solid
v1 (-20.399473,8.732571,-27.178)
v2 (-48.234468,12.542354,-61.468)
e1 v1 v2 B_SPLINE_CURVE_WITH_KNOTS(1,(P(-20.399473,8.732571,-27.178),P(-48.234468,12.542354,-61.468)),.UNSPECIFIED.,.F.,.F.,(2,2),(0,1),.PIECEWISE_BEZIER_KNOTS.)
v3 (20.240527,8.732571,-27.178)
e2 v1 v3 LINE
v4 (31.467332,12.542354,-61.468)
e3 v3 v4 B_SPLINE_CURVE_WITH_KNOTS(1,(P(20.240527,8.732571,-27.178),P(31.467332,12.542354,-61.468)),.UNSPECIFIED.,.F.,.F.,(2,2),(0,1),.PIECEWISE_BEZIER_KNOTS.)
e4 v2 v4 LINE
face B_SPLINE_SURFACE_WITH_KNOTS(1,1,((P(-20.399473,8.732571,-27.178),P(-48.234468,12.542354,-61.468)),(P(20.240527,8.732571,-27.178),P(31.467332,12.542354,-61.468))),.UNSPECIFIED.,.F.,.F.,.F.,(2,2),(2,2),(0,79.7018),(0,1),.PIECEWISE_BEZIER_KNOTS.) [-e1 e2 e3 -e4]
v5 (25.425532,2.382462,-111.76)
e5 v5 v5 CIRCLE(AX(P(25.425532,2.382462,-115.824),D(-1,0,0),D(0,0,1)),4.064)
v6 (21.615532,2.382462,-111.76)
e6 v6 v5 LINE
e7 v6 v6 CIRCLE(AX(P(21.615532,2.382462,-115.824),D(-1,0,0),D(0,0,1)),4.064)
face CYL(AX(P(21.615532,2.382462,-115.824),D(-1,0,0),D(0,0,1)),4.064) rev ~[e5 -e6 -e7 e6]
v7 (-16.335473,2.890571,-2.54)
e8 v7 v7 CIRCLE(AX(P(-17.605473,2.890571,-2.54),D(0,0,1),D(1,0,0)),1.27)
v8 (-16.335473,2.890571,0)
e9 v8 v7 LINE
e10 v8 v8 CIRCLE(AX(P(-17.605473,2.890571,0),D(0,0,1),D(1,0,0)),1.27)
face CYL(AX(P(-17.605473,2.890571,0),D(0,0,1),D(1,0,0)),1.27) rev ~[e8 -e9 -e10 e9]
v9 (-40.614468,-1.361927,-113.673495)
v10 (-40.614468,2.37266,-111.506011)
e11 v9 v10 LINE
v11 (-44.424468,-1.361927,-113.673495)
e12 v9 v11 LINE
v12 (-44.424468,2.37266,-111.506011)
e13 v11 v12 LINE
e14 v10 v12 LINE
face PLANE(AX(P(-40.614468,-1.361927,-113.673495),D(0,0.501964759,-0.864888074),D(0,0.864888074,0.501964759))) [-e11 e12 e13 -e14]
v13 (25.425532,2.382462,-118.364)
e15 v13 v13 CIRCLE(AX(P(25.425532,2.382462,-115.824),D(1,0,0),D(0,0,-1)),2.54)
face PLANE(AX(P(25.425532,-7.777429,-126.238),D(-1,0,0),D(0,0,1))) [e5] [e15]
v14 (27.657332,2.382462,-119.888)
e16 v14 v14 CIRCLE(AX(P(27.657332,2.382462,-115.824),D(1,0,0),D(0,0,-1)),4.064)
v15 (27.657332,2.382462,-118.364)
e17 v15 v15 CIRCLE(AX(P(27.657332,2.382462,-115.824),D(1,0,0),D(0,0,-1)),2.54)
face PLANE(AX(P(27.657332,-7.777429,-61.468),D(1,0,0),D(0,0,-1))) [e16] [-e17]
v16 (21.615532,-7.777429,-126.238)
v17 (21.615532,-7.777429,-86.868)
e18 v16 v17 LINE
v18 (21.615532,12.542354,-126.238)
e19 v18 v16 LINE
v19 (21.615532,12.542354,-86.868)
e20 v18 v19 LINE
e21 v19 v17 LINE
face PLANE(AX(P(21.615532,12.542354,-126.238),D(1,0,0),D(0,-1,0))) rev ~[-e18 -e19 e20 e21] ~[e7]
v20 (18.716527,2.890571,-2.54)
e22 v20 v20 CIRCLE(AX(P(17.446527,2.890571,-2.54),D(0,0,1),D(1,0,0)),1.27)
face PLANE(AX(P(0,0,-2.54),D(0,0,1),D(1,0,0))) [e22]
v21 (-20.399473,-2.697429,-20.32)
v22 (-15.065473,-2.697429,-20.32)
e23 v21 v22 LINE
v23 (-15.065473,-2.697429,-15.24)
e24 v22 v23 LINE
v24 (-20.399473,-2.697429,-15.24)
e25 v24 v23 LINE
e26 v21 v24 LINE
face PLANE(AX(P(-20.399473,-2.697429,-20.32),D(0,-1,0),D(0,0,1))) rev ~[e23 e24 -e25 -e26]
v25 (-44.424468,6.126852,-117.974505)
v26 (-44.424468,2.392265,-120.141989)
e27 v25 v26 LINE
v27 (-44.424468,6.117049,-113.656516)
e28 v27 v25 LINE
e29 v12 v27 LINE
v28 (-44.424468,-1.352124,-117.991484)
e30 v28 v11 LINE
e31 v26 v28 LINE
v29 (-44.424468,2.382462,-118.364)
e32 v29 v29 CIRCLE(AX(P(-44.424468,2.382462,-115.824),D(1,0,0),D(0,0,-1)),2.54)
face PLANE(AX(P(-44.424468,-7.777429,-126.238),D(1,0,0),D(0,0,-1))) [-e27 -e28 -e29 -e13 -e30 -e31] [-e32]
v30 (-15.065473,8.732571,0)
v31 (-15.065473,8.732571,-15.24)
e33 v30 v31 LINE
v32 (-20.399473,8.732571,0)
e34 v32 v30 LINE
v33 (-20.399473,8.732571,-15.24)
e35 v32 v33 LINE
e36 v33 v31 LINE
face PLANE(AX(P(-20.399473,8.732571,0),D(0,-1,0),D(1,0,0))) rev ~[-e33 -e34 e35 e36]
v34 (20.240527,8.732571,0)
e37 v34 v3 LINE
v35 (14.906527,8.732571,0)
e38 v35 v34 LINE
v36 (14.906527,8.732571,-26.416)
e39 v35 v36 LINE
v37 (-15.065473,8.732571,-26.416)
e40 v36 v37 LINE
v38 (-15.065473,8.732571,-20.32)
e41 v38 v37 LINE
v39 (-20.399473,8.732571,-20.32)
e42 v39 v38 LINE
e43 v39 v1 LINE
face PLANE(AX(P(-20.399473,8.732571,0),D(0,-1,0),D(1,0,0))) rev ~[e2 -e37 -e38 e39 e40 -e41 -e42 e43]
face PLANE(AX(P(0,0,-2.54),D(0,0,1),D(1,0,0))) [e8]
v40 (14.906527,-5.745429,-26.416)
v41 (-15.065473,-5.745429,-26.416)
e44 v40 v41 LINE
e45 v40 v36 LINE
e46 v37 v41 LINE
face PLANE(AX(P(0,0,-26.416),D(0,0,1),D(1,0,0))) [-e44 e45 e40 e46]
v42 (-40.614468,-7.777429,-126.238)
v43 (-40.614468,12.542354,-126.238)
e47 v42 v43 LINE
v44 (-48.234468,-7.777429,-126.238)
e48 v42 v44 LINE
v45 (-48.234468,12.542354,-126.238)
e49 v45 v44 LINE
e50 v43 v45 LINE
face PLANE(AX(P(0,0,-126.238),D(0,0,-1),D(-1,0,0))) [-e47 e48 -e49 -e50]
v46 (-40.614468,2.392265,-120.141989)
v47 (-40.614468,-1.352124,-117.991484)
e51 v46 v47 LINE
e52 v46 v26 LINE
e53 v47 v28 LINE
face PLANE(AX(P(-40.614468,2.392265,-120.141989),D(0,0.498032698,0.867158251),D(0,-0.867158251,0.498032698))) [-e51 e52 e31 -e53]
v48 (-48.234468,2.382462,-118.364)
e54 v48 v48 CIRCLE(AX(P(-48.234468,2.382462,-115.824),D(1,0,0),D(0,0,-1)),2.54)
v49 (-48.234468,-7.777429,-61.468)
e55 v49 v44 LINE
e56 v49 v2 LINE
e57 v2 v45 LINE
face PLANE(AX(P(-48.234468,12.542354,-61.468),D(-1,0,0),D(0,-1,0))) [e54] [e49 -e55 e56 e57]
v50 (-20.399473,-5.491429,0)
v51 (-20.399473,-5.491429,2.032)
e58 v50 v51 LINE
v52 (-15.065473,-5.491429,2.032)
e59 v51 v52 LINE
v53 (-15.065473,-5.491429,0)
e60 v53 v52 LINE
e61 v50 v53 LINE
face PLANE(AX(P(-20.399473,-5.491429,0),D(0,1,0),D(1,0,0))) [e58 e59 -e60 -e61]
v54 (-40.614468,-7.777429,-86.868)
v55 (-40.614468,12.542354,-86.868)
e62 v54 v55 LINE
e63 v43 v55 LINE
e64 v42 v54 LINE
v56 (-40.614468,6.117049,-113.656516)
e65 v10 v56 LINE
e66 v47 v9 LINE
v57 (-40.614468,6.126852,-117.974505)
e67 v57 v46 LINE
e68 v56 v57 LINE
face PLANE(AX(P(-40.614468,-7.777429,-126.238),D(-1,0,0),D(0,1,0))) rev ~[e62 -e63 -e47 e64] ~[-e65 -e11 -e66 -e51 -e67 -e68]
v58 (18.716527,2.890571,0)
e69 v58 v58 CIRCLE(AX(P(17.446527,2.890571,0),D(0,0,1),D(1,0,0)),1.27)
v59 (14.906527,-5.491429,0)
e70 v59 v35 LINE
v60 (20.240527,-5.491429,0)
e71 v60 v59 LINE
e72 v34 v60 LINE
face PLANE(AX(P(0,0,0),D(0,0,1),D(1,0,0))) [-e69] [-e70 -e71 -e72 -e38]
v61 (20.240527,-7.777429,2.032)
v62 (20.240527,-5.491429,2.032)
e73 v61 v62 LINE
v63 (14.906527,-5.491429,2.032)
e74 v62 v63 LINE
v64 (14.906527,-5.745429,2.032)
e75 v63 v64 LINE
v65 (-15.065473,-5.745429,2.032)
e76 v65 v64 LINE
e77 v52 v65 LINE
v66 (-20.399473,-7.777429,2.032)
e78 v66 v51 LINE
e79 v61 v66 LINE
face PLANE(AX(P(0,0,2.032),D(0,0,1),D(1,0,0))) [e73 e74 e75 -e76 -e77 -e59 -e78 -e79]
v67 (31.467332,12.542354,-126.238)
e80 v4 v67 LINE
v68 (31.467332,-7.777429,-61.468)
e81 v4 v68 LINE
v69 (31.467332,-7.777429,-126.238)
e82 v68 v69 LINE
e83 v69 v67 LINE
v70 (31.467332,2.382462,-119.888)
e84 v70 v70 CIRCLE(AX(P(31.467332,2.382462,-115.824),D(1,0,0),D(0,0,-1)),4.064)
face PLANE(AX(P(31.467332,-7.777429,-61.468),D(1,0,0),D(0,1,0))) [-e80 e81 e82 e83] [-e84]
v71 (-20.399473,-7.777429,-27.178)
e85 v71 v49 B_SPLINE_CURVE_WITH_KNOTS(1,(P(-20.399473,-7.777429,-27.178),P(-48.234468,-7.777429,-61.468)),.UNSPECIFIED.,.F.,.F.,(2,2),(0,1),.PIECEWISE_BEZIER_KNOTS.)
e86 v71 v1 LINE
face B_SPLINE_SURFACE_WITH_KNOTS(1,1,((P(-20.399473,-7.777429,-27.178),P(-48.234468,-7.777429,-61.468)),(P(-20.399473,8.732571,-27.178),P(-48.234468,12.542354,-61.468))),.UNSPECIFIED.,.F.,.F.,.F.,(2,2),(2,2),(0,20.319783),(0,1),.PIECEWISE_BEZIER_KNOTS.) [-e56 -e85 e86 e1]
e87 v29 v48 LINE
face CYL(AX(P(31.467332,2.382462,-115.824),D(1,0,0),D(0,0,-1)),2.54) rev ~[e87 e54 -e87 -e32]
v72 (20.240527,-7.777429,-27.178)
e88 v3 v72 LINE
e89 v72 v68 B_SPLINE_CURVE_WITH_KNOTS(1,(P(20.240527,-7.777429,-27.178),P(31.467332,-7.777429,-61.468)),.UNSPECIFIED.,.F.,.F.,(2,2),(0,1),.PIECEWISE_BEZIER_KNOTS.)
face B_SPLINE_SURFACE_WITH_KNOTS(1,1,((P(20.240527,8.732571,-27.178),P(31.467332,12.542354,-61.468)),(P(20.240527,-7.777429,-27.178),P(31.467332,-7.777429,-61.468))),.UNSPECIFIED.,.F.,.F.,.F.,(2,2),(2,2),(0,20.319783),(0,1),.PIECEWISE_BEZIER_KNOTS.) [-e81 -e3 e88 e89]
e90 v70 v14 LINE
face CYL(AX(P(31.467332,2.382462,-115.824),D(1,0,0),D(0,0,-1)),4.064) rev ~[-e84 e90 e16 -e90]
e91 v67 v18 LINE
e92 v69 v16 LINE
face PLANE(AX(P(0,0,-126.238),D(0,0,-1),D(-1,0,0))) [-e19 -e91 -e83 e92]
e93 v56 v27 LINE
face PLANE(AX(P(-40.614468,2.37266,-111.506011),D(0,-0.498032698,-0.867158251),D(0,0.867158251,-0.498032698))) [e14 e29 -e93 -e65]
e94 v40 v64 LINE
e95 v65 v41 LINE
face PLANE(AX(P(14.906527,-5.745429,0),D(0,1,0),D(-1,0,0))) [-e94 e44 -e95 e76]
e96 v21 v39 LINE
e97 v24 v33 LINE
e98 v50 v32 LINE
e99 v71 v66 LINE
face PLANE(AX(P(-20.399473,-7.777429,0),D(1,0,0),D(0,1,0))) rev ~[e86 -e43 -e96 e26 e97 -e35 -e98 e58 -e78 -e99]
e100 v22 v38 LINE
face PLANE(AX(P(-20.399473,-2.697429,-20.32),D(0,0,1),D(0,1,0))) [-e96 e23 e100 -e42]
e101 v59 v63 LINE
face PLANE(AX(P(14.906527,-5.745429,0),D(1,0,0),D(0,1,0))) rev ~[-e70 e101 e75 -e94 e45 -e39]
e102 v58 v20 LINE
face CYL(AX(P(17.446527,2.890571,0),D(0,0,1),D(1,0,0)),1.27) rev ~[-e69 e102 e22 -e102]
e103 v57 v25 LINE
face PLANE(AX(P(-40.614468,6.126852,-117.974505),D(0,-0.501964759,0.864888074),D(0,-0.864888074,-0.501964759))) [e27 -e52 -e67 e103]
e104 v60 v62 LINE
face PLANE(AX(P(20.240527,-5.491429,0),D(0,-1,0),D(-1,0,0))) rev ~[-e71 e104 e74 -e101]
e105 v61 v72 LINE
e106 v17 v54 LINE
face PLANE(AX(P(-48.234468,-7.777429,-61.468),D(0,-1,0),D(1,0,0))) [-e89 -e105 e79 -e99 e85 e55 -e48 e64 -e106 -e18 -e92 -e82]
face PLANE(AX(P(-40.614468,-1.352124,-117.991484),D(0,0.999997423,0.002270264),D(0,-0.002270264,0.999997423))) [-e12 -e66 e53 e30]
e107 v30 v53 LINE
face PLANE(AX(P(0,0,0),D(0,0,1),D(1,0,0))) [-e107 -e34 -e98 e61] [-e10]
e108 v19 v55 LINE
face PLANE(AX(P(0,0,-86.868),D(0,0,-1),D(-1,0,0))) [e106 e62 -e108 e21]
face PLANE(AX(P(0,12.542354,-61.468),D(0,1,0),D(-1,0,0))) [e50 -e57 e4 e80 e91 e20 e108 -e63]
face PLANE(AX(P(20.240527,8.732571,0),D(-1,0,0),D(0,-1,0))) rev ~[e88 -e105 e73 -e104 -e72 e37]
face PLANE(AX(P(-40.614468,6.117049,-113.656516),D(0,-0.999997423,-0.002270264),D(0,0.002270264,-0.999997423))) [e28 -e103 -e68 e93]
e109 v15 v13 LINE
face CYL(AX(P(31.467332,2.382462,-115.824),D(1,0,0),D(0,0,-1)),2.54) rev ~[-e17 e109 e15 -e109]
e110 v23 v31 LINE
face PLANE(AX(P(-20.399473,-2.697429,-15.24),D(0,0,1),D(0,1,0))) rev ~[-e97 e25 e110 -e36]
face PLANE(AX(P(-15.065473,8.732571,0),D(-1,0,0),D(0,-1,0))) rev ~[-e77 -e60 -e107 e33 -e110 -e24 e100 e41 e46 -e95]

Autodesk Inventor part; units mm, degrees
ref_plane "YZ Plane" through (0, 0, 0) normal (1, 0, 0) x (0, 1, 0)
sketch "Sketch1" plane through (0, 0, 0) normal (0, 0, 1) x (1, 0, 0)
  line L0 (-20.399473, 8.732571) -> (20.240527, 8.732571)
  line L1 (20.240527, 8.732571) -> (20.240527, -7.777429)
  line L2 (20.240527, -7.777429) -> (-20.399473, -7.777429)
  line L3 (-20.399473, -7.777429) -> (-20.399473, 8.732571)
  point P0 (0, 0)
  dimension "d0" = 40.64
  dimension "d1" = 16.51
extrude "Extrusion1" add sketch "Sketch1" against normal blind 27.178
sketch "Sketch2" plane through (0, 0, 0) normal (0, 0, 1) x (1, 0, 0)
  line L0 (20.240527, -7.777429) -> (-20.399473, -7.777429)
  line L1 (-20.399473, -7.777429) -> (-20.399473, -5.491429)
  line L2 (-20.399473, -7.777429) -> (-20.399473, 8.732571)
  line L3 (-20.399473, -5.491429) -> (-15.065473, -5.491429)
  line L4 (-15.065473, -5.491429) -> (-15.065473, -5.745429)
  line L5 (20.240527, -7.777429) -> (20.240527, -5.491429)
  line L6 (20.240527, 8.732571) -> (20.240527, -7.777429)
  line L7 (20.240527, -5.491429) -> (14.906527, -5.491429)
  line L8 (14.906527, -5.491429) -> (14.906527, -5.745429)
  line L9 (-15.065473, -5.745429) -> (14.906527, -5.745429)
  point P0 (0, 0)
  dimension "d4" = 2.286
  dimension "d5" = 5.334
  dimension "d6" = 0.254
  dimension "d7" = 2.286
  dimension "d8" = 5.334
  dimension "d9" = 0.254
extrude "Extrusion2" add sketch "Sketch2" along normal blind 2.032
sketch "Sketch3" plane through (0, 0, 0) normal (0, 0, 1) x (1, 0, 0)
  line L0 (-20.399473, 8.732571) -> (-20.399473, -5.491429)
  line L1 (20.240527, 8.732571) -> (-20.399473, 8.732571)
  line L2 (14.906527, -5.745429) -> (-15.065473, -5.745429)
  line L3 (-15.065473, 8.732571) -> (-15.065473, -5.745429)
  line L4 (-15.065473, -5.745429) -> (14.906527, -5.745429)
  line L5 (14.906527, -5.745429) -> (14.906527, 8.732571)
  line L6 (-15.065473, 8.732571) -> (14.906527, 8.732571)
  point P0 (0, 0)
  dimension "d12" = 5.334
extrude "Extrusion3" cut sketch "Sketch3" against normal blind 26.416
ref_plane "Work Plane1" through (0, 0, -61.468) normal (0, 0, -1) x (-1, 0, 0)
sketch "Sketch6" plane through (0, 0, -27.178) normal (0, 0, -1) x (-1, 0, 0)
  line L0 (20.399473, -7.777429) -> (-20.240527, -7.777429)
  point P0 (0, 0)
sketch "Sketch8" plane through (0, 0, -61.468) normal (0, 0, -1) x (-1, 0, 0)
  line L0 (0, 12.542354) -> (44.128566, 12.542354)
  line L1 (-20.240527, -7.777429) -> (20.399473, -7.777429)
  line L2 (0.079473, -7.777429) -> (44.128566, -7.777429)
  line L3 (-31.467332, 12.542354) -> (48.234468, 12.542354)
  line L4 (48.234468, 12.542354) -> (48.234468, -7.777429)
  line L5 (48.234468, -7.777429) -> (-31.467332, -7.777429)
  line L6 (-31.467332, -7.777429) -> (-31.467332, 12.542354)
  line L7 (-31.467332, 12.542354) -> (48.234468, 12.542354)
  line L8 (48.234468, 12.542354) -> (48.234468, -7.777429)
  line L9 (48.234468, -7.777429) -> (-31.467332, -7.777429)
  line L10 (-31.467332, -7.777429) -> (-31.467332, 12.542354)
  point P0 (0, 0)
sketch "Sketch8 outline for Loft1" plane through (0, 0, -61.468) normal (0, 0, -1) x (-1, 0, 0)
  line L0 (48.234468, 12.542354) -> (-31.467332, 12.542354)
  line L1 (48.234468, -7.777429) -> (48.234468, 12.542354)
  line L2 (-31.467332, -7.777429) -> (48.234468, -7.777429)
  line L3 (-31.467332, 12.542354) -> (-31.467332, -7.777429)
loft "Loft1" add profiles "Sketch8 outline for Loft1" section 1 edges at (-0.079473, -7.777429, -27.178) (-20.399473, 0.477571, -27.178) (-0.079473, 8.732571, -27.178) (20.240527, 0.477571, -27.178)
ref_plane "Work Plane2" through (31.467332, -7.777429, -126.238) normal (0, 0, -1) x (-1, 0, 0)
extrude "Extrusion4" add sketch "Sketch8" along normal blind 64.77
sketch "Sketch9" plane through (0, 0, -126.238) normal (0, 0, -1) x (-1, 0, 0)
  line L0 (40.614468, -7.777429) -> (40.614468, 12.542354)
  line L1 (-31.467332, 12.542354) -> (48.234468, 12.542354)
  line L2 (40.614468, 12.542354) -> (-21.615532, 12.542354)
  line L3 (-21.615532, 12.542354) -> (-21.615532, -7.777429)
  line L4 (-20.240527, -7.777429) -> (-31.467332, -7.777429)
  line L5 (-21.615532, -7.777429) -> (40.614468, -7.777429)
  point P0 (0, 0)
  point P1 (48.234468, -7.777429)
  dimension "d27" = 7.62
  dimension "d28" = 62.23
extrude "Extrusion5" cut sketch "Sketch9" against normal blind 39.37
sketch "Sketch10" plane through (21.615532, -7.777429, -126.238) normal (-1, 0, 0) x (0, 0, 1)
  point P0 (126.238, 7.777429)
sketch "Sketch11" plane through (31.467332, -7.777429, -61.468) normal (1, 0, 0) x (0, 0, -1)
  line L0 (64.77, 0) -> (64.77, 20.319783)
  line L1 (64.77, 10.159891) -> (54.356, 10.159891)
  circle A0 centre (54.356, 10.159891) radius 2.54
  circle A1 centre (54.356, 10.159891) radius 4.064
  point P0 (-61.468, 7.777429)
  dimension "d31" = 10.414
  dimension "d32" = 5.08
  dimension "d33" = 8.128
extrude "Extrusion6" cut sketch "Sketch11" against normal through all contours A0
sketch "Sketch12" plane through (-20.399473, -5.491429, 0) normal (-1, 0, 0) x (0, 0, 1)
  line L0 (-27.178, -2.286) -> (2.032, -2.286) projected
  line L1 (-20.32, -2.286) -> (-15.24, -2.286) construction
  line L2 (-20.32, 2.794) -> (-15.24, 2.794)
  line L3 (-15.24, 2.794) -> (-15.24, 14.224)
  line L4 (-20.32, 2.794) -> (-20.32, 14.224)
  line L5 (-20.32, 14.224) -> (-15.24, 14.224)
  point P0 (0, 5.491429)
  point P1 (-27.178, 14.224)
  dimension "d36" = 6.858
  dimension "d37" = 5.08
  dimension "d39" = 5.08
extrude "Extrusion7" cut sketch "Sketch12" against normal blind 25.4
sketch "Sketch13" plane through (0, 0, 0) normal (0, 0, 1) x (1, 0, 0)
  line L0 (-15.065473, -5.491429) -> (-20.399473, -5.491429)
  line L1 (-20.399473, -5.491429) -> (-17.605473, -5.491429)
  circle A0 centre (-17.605473, 2.890571) radius 1.27
  line L2 (20.240527, -5.491429) -> (14.906527, -5.491429)
  line L3 (20.240527, -5.491429) -> (17.446527, -5.491429)
  circle A1 centre (17.446527, 2.890571) radius 1.27
  point P0 (0, 0)
  dimension "d42" = 2.794
  dimension "d44" = 2.54
  dimension "d45" = 2.794
  dimension "d47" = 2.54
extrude "Extrusion8" cut sketch "Sketch13" against normal blind 2.54
sketch "Sketch15" plane through (31.467332, -7.777429, -61.468) normal (1, 0, 0) x (0, 0, -1)
  circle A0 centre (54.356, 10.159891) radius 2.54
  circle A1 centre (54.356, 10.159891) radius 4.064
  point P0 (-61.468, 7.777429)
  dimension "d51" = 8.128
extrude "Extrusion9" cut sketch "Sketch15" against normal blind 3.81 contours A0 | A1
sketch "Sketch16" plane through (21.615532, -7.777429, -126.238) normal (-1, 0, 0) x (0, 0, 1)
  point P0 (126.238, 7.777429)
sketch "Sketch17" plane through (21.615532, -7.777429, -126.238) normal (-1, 0, 0) x (0, 0, 1)
  circle A0 centre (10.414, 10.159891) radius 2.54
  circle A1 centre (10.414, 10.159891) radius 4.064
  point P0 (126.238, 7.777429)
  dimension "d54" = 8.128
extrude "Extrusion10" cut sketch "Sketch17" against normal blind 3.81 contours A0 | A1
sketch "Sketch18" plane through (-40.614468, -7.777429, -126.238) normal (1, 0, 0) x (0, 0, -1)
  circle A0 centre (-10.414, 10.159891) radius 2.54
  line L0 (-8.246516, 6.425305) -> (-12.564505, 6.415502)
  line L1 (-12.564505, 6.415502) -> (-14.731989, 10.150089)
  line L2 (-14.731989, 10.150089) -> (-12.581484, 13.894478)
  line L3 (-12.581484, 13.894478) -> (-8.263495, 13.904281)
  line L4 (-8.263495, 13.904281) -> (-6.096011, 10.169694)
  line L5 (-6.096011, 10.169694) -> (-8.246516, 6.425305)
  point P0 (-126.238, 7.777429)
extrude "Extrusion12" cut sketch "Sketch18" against normal blind 3.81
equation "\"d48\" = d47"
